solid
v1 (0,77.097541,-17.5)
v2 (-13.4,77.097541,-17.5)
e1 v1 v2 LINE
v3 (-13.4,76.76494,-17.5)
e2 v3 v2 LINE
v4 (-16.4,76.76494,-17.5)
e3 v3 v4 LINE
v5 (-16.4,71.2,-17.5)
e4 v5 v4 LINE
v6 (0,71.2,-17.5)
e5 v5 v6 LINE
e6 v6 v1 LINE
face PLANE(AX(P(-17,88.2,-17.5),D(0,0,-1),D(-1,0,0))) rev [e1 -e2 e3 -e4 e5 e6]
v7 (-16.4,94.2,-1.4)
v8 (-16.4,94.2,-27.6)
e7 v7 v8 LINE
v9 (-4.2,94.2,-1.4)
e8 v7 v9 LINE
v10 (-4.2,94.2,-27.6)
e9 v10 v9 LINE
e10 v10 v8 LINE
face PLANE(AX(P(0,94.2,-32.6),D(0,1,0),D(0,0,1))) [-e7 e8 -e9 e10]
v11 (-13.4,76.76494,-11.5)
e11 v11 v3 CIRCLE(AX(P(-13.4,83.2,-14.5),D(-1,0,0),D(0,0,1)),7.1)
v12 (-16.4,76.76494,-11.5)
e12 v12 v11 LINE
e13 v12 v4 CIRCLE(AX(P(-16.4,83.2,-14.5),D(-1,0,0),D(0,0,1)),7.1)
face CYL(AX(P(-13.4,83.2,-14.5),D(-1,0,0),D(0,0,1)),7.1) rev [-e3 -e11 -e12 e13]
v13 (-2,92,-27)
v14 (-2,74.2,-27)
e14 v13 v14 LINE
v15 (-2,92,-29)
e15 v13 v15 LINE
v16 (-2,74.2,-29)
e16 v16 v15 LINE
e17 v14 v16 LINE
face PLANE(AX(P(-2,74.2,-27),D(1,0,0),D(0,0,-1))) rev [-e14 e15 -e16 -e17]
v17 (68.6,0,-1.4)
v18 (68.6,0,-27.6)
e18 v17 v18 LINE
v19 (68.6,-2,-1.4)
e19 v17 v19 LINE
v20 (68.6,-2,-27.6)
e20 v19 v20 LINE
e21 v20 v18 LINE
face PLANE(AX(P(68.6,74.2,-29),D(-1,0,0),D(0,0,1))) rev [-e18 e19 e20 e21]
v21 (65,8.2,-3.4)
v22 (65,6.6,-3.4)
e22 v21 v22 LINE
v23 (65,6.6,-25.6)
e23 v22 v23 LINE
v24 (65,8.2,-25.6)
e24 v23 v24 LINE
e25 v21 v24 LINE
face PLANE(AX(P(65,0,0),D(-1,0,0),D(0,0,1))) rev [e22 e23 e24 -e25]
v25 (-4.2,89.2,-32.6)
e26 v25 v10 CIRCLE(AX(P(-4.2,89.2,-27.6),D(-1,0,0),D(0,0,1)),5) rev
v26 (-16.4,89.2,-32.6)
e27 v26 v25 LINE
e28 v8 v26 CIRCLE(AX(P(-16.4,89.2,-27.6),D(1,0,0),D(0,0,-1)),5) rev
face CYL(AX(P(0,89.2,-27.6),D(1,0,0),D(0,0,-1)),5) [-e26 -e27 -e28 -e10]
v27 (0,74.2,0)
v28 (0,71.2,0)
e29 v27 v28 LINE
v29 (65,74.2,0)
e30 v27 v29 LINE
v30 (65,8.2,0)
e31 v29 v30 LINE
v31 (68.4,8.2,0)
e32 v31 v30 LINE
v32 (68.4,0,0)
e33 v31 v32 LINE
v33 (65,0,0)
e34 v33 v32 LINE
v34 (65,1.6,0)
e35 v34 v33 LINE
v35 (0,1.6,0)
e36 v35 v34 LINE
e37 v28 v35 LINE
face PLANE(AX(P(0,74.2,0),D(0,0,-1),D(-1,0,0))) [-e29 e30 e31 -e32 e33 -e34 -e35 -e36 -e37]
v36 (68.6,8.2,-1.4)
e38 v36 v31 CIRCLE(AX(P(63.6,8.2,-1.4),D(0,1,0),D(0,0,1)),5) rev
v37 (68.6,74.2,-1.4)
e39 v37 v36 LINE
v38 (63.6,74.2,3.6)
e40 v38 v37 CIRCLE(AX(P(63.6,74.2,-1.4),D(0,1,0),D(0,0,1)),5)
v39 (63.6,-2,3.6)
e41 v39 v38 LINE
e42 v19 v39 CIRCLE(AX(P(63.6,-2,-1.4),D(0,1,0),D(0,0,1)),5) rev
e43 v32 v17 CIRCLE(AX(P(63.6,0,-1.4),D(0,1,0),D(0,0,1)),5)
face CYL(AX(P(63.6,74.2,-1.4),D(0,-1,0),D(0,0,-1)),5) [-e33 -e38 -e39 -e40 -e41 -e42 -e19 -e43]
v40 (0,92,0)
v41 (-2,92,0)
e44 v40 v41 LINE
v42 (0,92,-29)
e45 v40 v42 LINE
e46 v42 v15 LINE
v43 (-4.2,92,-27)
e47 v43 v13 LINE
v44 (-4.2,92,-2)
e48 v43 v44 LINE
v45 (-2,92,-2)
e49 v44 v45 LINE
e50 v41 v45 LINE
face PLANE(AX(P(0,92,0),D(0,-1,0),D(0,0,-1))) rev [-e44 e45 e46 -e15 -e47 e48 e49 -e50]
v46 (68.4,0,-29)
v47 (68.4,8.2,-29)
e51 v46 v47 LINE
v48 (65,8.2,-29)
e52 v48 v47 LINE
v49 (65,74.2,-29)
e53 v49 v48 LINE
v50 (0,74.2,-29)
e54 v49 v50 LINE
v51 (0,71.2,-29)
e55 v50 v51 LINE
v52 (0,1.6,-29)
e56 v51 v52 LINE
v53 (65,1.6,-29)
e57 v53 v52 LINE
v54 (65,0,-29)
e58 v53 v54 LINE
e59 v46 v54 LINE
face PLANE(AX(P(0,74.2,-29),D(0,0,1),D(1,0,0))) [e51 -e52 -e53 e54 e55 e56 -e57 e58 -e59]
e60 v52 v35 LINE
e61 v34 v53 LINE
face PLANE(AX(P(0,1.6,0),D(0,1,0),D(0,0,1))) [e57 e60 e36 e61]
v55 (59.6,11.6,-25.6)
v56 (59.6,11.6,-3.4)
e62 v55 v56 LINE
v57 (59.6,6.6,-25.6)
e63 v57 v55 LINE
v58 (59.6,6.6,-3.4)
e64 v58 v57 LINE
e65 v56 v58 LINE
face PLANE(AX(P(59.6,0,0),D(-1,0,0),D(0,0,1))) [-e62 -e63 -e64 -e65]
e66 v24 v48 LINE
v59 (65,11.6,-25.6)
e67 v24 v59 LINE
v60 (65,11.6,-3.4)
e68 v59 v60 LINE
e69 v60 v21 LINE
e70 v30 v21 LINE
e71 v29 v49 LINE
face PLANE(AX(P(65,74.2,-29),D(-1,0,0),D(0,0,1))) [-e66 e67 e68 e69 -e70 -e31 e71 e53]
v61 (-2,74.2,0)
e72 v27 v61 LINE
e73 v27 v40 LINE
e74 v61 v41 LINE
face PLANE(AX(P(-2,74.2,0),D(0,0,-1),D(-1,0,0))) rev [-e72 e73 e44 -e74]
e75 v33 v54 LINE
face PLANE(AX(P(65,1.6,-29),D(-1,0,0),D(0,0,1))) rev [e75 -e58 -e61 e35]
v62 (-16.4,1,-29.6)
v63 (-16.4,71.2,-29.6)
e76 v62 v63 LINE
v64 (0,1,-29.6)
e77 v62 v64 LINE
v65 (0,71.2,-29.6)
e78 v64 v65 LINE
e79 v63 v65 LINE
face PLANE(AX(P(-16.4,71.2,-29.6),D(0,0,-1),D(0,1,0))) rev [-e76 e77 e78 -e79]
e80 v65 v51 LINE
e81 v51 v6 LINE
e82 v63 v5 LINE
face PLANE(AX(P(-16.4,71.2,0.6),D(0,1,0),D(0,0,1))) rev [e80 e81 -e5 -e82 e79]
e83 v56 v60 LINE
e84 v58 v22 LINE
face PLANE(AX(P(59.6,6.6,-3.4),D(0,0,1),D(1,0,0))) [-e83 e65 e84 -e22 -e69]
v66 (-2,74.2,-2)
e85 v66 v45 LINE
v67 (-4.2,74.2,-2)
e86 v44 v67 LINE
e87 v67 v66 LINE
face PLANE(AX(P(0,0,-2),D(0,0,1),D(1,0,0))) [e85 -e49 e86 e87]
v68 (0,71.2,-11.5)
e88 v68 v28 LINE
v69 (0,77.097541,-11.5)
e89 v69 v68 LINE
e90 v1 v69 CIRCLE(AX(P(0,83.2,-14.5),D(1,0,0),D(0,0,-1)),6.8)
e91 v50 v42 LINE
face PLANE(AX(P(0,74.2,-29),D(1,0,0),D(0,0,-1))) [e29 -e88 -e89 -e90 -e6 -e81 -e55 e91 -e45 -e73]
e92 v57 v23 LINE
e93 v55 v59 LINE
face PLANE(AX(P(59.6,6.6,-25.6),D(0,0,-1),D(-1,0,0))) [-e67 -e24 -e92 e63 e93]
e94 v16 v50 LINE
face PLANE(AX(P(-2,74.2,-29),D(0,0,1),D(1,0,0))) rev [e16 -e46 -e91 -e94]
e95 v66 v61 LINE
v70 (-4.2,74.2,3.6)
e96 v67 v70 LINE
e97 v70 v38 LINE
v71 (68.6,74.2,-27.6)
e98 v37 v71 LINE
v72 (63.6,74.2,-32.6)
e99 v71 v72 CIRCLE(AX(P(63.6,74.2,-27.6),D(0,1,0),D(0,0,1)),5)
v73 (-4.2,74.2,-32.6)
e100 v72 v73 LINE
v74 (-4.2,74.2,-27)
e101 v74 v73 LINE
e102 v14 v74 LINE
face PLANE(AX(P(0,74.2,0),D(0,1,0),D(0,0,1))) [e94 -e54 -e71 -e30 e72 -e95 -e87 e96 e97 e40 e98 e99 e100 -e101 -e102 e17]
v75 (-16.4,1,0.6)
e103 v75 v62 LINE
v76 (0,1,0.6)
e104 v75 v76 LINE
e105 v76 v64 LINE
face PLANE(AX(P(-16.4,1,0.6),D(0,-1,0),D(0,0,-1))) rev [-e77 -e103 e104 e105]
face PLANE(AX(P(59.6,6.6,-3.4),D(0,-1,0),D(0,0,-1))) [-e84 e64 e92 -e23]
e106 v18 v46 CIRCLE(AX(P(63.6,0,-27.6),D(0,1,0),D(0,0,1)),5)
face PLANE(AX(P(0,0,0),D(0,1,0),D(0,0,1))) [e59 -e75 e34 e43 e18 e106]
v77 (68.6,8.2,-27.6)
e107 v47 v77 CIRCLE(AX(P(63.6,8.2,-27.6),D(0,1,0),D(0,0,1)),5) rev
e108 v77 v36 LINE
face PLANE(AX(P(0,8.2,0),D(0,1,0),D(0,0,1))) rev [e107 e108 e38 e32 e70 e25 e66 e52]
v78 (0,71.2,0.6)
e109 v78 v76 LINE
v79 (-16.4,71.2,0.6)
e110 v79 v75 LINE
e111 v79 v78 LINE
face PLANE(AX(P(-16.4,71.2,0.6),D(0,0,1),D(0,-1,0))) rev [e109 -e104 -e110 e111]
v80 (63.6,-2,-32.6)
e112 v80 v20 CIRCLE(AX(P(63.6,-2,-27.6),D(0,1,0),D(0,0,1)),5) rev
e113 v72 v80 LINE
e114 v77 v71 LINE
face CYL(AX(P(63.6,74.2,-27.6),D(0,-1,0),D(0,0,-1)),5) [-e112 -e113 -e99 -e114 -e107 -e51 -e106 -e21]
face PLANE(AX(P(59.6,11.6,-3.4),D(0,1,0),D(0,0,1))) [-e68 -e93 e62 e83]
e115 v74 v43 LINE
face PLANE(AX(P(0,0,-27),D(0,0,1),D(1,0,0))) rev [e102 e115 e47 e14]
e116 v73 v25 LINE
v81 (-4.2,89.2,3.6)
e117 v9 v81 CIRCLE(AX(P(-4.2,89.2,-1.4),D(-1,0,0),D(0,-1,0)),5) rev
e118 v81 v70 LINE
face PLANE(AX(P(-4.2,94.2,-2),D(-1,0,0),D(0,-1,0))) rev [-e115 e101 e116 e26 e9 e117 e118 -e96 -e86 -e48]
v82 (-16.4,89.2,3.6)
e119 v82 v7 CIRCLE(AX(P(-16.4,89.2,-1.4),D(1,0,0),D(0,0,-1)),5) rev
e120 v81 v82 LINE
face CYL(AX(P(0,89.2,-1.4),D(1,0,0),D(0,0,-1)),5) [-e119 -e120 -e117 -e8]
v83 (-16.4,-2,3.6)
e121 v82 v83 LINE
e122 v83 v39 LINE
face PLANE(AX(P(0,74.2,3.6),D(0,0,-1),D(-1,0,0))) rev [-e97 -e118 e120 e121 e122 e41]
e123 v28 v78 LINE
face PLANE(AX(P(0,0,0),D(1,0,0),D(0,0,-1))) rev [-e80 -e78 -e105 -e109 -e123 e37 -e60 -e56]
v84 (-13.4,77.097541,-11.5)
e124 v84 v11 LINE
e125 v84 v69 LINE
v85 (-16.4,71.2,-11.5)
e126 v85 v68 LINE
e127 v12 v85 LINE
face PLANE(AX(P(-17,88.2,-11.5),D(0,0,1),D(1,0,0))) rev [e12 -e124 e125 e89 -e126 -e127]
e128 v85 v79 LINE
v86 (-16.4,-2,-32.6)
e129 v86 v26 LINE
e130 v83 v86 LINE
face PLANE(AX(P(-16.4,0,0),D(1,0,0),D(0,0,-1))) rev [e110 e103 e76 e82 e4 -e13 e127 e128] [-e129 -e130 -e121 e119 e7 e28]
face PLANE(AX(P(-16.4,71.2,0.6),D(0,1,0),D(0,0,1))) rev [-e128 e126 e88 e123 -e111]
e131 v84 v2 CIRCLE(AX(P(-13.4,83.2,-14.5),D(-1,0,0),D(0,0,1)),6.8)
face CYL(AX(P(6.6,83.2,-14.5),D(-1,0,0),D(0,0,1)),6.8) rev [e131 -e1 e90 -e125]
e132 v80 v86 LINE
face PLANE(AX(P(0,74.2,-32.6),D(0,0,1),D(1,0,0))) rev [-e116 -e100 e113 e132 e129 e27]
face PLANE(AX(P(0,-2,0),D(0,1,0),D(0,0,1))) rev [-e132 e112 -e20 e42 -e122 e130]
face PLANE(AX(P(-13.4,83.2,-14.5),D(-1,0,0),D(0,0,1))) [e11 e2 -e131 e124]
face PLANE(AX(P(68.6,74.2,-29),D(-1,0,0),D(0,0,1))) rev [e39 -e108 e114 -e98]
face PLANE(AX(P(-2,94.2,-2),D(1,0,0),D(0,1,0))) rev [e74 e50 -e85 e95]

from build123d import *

# Parameters (mm, degrees)
SKETCH_1_W           = 72.2
SKETCH_1_H           = 36.2
SKETCH_1_W_2         = 65
SKETCH_1_H_2         = 29
EXTRUDE_1_DEPTH      = 74.2
SKETCH_2_W           = 72.2
SKETCH_2_H           = 36.2
EXTRUDE_2_DEPTH      = 2
SKETCH_3_W           = 36.2
SKETCH_3_H           = 76.2
SKETCH_3_W_2         = 30.2
SKETCH_3_H_2         = 70.2
EXTRUDE_2_2_DEPTH    = 16.4
SKETCH_4_W           = 30.2
SKETCH_4_H           = 70.2
CUT_EXTRUDE_1_DEPTH  = 16.4
SKETCH_5_W           = 29
SKETCH_5_H           = 4.8
CUT_EXTRUDE_2_DEPTH  = 5
SKETCH_8_W           = 36.2
SKETCH_8_H           = 20
EXTRUDE_3_DEPTH      = 16.4
SKETCH_7_W           = 6
SKETCH_7_H           = 17
CUT_EXTRUDE_3_DEPTH  = 17
SKETCH_9_W           = 6
SKETCH_9_H           = 17
EXTRUDE_4_DEPTH      = 2
SKETCH_10_R          = 7.1
CUT_EXTRUDE_4_DEPTH  = 3
SKETCH_11_W          = 2.2
SKETCH_11_H          = 20
CUT_EXTRUDE_5_DEPTH  = 5.6
SKETCH_12_W          = 2.2
SKETCH_12_H          = 20
CUT_EXTRUDE_6_DEPTH  = 5.6
SKETCH_13_W          = 2
SKETCH_13_H          = 3.6
CUT_EXTRUDE_7_DEPTH  = 20
FILLET_1_R           = 5
FILLET_2_R           = 5
FILLET_3_R           = 5
FILLET_4_R           = 5
SKETCH_14_W          = 4.2
SKETCH_14_H          = 29
CUT_EXTRUDE_8_DEPTH  = 2.2
SKETCH_15_R          = 6.8
CUT_EXTRUDE_9_DEPTH  = 20
SKETCH_16_W          = 6
SKETCH_16_H          = 5.564939783
CUT_EXTRUDE_10_DEPTH = 10
SKETCH_17_W          = 65
SKETCH_17_H          = 29
EXTRUDE_5_DEPTH      = 1.6
SKETCH_18_W          = 3.6
SKETCH_18_H          = 29
CUT_EXTRUDE_11_DEPTH = 3.4
SKETCH_20_W          = 22.2
SKETCH_20_H          = 5
EXTRUDE_6_DEPTH      = 5.4


with BuildPart() as part:
    # 草图1 → 拉伸-薄壁1 (new body)
    with BuildSketch(Plane(origin=(0, 0, 0), x_dir=(1, 0, 0), z_dir=(0, 1, 0))):
        with Locations((32.5, 14.5)):
            Rectangle(SKETCH_1_W, SKETCH_1_H)
        with Locations((32.5, 14.5)):
            Rectangle(SKETCH_1_W_2, SKETCH_1_H_2, mode=Mode.SUBTRACT)
    extrude(amount=EXTRUDE_1_DEPTH)

    # 草图2 → Extrude 2 (add)
    with BuildSketch(Plane(origin=(0, 0, 0), x_dir=(1, 0, 0), z_dir=(0, 1, 0))):
        with Locations((32.5, 14.5)):
            Rectangle(SKETCH_2_W, SKETCH_2_H)
    extrude(amount=-EXTRUDE_2_DEPTH)

    # 草图3 → Extrude 2 2 (add)
    with BuildSketch(Plane(origin=(0, 0, 0), x_dir=(0, 0, -1), z_dir=(1, 0, 0))):
        with Locations((14.5, 36.1)):
            Rectangle(SKETCH_3_W, SKETCH_3_H)
        with Locations((14.5, 36.1)):
            Rectangle(SKETCH_3_W_2, SKETCH_3_H_2, mode=Mode.SUBTRACT)
    extrude(amount=-EXTRUDE_2_2_DEPTH)

    # 草图4 → 切除-拉伸1 (cut)
    with BuildSketch(Plane(origin=(0, 0, 0), x_dir=(0, 0, -1), z_dir=(1, 0, 0))):
        with Locations((14.5, 36.1)):
            Rectangle(SKETCH_4_W, SKETCH_4_H)
    extrude(amount=-CUT_EXTRUDE_1_DEPTH, mode=Mode.SUBTRACT)

    # 草图5 → 切除-拉伸2 (cut)
    with BuildSketch(Plane(origin=(68.6, 0, 0), x_dir=(0, 0, -1), z_dir=(1, 0, 0))):
        with Locations((14.5, 2.4)):
            Rectangle(SKETCH_5_W, SKETCH_5_H)
    extrude(amount=-CUT_EXTRUDE_2_DEPTH, mode=Mode.SUBTRACT)

    # 草图8 → 凸台-拉伸3 (add)
    with BuildSketch(Plane.ZY.offset(16.4)):
        with Locations((-14.5, 84.2)):
            Rectangle(SKETCH_8_W, SKETCH_8_H)
    extrude(amount=-EXTRUDE_3_DEPTH)

    # 草图7 → 切除-拉伸3 (cut)
    with BuildSketch(Plane(origin=(0, 0, 0), x_dir=(0, 0, -1), z_dir=(1, 0, 0))):
        with Locations((14.5, 79.7)):
            Rectangle(SKETCH_7_W, SKETCH_7_H)
    extrude(amount=-CUT_EXTRUDE_3_DEPTH, mode=Mode.SUBTRACT)

    # 草图9 → 凸台-拉伸4 (add)
    with BuildSketch(Plane.ZY.offset(16.4)):
        with Locations((-14.5, 79.7)):
            Rectangle(SKETCH_9_W, SKETCH_9_H)
    extrude(amount=-EXTRUDE_4_DEPTH)

    # 草图10 → 切除-拉伸4 (cut)
    with BuildSketch(Plane.ZY.offset(16.4)):
        with Locations((-14.5, 83.2)):
            Circle(SKETCH_10_R)
    extrude(amount=-CUT_EXTRUDE_4_DEPTH, mode=Mode.SUBTRACT)

    # 草图11 → 切除-拉伸5 (cut)
    with BuildSketch(Plane.XY.offset(3.6)):
        with Locations((-3.1, 84.2)):
            Rectangle(SKETCH_11_W, SKETCH_11_H)
    extrude(amount=-CUT_EXTRUDE_5_DEPTH, mode=Mode.SUBTRACT)

    # 草图12 → 切除-拉伸6 (cut)
    with BuildSketch(Plane(origin=(0, 0, -32.6), x_dir=(-1, 0, 0), z_dir=(0, 0, -1))):
        with Locations((3.1, 84.2)):
            Rectangle(SKETCH_12_W, SKETCH_12_H)
    extrude(amount=-CUT_EXTRUDE_6_DEPTH, mode=Mode.SUBTRACT)

    # 草图13 → 切除-拉伸7 (cut)
    with BuildSketch(Plane(origin=(0, 94.2, 0), x_dir=(1, 0, 0), z_dir=(0, 1, 0))):
        with Locations((-1, 30.8)):
            Rectangle(SKETCH_13_W, SKETCH_13_H)
        with Locations((-1, -1.8)):
            Rectangle(SKETCH_13_W, SKETCH_13_H)
    extrude(amount=-CUT_EXTRUDE_7_DEPTH, mode=Mode.SUBTRACT)

    # 圆角1
    fillet_1_edges = [part.edges().sort_by_distance(p)[0] for p in [
        (-10.3, 94.2, 3.6),
    ]]
    fillet(fillet_1_edges, radius=FILLET_1_R)

    # 圆角2
    fillet_2_edges = [part.edges().sort_by_distance(p)[0] for p in [
        (-10.3, 94.2, -32.6),
    ]]
    fillet(fillet_2_edges, radius=FILLET_2_R)

    # 圆角3
    # the kernel refuses this fillet: 5 mm, written as the material it takes off along each edge
    with BuildSketch(Plane(origin=(68.6, -14.5, 3.6), x_dir=(-1, 0, 0), z_dir=(0, 1, 0))) as fillet_3_piece_1:
        with BuildLine():
            CenterArc((FILLET_3_R, -FILLET_3_R), FILLET_3_R, 90, 90)
            Line((0, -FILLET_3_R), (0, 0))
            Line((0, 0), (FILLET_3_R, 0))
        make_face()
    extrude(amount=101.2, mode=Mode.SUBTRACT)

    # 圆角4
    # the kernel refuses this fillet: 5 mm, written as the material it takes off along each edge
    with BuildSketch(Plane(origin=(68.6, -14.5, -32.6), x_dir=(-1, 0, 0), z_dir=(0, 1, 0))) as fillet_4_piece_1:
        with BuildLine():
            CenterArc((FILLET_4_R, FILLET_4_R), FILLET_4_R, 180, 90)
            Line((0, FILLET_4_R), (0, 0))
            Line((0, 0), (FILLET_4_R, 0))
        make_face()
    extrude(amount=101.2, mode=Mode.SUBTRACT)

    # 草图14 → 切除-拉伸8 (cut)
    with BuildSketch(Plane(origin=(0, 94.2, 0), x_dir=(1, 0, 0), z_dir=(0, 1, 0))):
        with Locations((-2.1, 14.5)):
            Rectangle(SKETCH_14_W, SKETCH_14_H)
    extrude(amount=-CUT_EXTRUDE_8_DEPTH, mode=Mode.SUBTRACT)

    # 草图15 → 切除-拉伸9 (cut)
    with BuildSketch(Plane.ZY.offset(13.4)):
        with Locations((-14.5, 83.2)):
            Circle(SKETCH_15_R)
    extrude(amount=-CUT_EXTRUDE_9_DEPTH, mode=Mode.SUBTRACT)

    # 草图16 → 切除-拉伸10 (cut)
    with BuildSketch(Plane(origin=(-14.4, 0, 0), x_dir=(0, 0, -1), z_dir=(1, 0, 0))):
        with Locations((14.5, 73.982469892)):
            Rectangle(SKETCH_16_W, SKETCH_16_H)
    extrude(amount=-CUT_EXTRUDE_10_DEPTH, mode=Mode.SUBTRACT)

    # 草图17 → 凸台-拉伸5 (add)
    with BuildSketch(Plane(origin=(0, 0, 0), x_dir=(1, 0, 0), z_dir=(0, 1, 0))):
        with Locations((32.5, 14.5)):
            Rectangle(SKETCH_17_W, SKETCH_17_H)
    extrude(amount=EXTRUDE_5_DEPTH)

    # 草图18 → 切除-拉伸11 (cut)
    with BuildSketch(Plane.XZ.offset(-4.8)):
        with Locations((66.8, -14.5)):
            Rectangle(SKETCH_18_W, SKETCH_18_H)
    extrude(amount=-CUT_EXTRUDE_11_DEPTH, mode=Mode.SUBTRACT)

    # 草图20 → 凸台-拉伸6 (add)
    with BuildSketch(Plane(origin=(65, 0, 0), x_dir=(0, 0, -1), z_dir=(1, 0, 0))):
        with Locations((14.5, 9.1)):
            Rectangle(SKETCH_20_W, SKETCH_20_H)
    extrude(amount=-EXTRUDE_6_DEPTH)


solid = part.part
